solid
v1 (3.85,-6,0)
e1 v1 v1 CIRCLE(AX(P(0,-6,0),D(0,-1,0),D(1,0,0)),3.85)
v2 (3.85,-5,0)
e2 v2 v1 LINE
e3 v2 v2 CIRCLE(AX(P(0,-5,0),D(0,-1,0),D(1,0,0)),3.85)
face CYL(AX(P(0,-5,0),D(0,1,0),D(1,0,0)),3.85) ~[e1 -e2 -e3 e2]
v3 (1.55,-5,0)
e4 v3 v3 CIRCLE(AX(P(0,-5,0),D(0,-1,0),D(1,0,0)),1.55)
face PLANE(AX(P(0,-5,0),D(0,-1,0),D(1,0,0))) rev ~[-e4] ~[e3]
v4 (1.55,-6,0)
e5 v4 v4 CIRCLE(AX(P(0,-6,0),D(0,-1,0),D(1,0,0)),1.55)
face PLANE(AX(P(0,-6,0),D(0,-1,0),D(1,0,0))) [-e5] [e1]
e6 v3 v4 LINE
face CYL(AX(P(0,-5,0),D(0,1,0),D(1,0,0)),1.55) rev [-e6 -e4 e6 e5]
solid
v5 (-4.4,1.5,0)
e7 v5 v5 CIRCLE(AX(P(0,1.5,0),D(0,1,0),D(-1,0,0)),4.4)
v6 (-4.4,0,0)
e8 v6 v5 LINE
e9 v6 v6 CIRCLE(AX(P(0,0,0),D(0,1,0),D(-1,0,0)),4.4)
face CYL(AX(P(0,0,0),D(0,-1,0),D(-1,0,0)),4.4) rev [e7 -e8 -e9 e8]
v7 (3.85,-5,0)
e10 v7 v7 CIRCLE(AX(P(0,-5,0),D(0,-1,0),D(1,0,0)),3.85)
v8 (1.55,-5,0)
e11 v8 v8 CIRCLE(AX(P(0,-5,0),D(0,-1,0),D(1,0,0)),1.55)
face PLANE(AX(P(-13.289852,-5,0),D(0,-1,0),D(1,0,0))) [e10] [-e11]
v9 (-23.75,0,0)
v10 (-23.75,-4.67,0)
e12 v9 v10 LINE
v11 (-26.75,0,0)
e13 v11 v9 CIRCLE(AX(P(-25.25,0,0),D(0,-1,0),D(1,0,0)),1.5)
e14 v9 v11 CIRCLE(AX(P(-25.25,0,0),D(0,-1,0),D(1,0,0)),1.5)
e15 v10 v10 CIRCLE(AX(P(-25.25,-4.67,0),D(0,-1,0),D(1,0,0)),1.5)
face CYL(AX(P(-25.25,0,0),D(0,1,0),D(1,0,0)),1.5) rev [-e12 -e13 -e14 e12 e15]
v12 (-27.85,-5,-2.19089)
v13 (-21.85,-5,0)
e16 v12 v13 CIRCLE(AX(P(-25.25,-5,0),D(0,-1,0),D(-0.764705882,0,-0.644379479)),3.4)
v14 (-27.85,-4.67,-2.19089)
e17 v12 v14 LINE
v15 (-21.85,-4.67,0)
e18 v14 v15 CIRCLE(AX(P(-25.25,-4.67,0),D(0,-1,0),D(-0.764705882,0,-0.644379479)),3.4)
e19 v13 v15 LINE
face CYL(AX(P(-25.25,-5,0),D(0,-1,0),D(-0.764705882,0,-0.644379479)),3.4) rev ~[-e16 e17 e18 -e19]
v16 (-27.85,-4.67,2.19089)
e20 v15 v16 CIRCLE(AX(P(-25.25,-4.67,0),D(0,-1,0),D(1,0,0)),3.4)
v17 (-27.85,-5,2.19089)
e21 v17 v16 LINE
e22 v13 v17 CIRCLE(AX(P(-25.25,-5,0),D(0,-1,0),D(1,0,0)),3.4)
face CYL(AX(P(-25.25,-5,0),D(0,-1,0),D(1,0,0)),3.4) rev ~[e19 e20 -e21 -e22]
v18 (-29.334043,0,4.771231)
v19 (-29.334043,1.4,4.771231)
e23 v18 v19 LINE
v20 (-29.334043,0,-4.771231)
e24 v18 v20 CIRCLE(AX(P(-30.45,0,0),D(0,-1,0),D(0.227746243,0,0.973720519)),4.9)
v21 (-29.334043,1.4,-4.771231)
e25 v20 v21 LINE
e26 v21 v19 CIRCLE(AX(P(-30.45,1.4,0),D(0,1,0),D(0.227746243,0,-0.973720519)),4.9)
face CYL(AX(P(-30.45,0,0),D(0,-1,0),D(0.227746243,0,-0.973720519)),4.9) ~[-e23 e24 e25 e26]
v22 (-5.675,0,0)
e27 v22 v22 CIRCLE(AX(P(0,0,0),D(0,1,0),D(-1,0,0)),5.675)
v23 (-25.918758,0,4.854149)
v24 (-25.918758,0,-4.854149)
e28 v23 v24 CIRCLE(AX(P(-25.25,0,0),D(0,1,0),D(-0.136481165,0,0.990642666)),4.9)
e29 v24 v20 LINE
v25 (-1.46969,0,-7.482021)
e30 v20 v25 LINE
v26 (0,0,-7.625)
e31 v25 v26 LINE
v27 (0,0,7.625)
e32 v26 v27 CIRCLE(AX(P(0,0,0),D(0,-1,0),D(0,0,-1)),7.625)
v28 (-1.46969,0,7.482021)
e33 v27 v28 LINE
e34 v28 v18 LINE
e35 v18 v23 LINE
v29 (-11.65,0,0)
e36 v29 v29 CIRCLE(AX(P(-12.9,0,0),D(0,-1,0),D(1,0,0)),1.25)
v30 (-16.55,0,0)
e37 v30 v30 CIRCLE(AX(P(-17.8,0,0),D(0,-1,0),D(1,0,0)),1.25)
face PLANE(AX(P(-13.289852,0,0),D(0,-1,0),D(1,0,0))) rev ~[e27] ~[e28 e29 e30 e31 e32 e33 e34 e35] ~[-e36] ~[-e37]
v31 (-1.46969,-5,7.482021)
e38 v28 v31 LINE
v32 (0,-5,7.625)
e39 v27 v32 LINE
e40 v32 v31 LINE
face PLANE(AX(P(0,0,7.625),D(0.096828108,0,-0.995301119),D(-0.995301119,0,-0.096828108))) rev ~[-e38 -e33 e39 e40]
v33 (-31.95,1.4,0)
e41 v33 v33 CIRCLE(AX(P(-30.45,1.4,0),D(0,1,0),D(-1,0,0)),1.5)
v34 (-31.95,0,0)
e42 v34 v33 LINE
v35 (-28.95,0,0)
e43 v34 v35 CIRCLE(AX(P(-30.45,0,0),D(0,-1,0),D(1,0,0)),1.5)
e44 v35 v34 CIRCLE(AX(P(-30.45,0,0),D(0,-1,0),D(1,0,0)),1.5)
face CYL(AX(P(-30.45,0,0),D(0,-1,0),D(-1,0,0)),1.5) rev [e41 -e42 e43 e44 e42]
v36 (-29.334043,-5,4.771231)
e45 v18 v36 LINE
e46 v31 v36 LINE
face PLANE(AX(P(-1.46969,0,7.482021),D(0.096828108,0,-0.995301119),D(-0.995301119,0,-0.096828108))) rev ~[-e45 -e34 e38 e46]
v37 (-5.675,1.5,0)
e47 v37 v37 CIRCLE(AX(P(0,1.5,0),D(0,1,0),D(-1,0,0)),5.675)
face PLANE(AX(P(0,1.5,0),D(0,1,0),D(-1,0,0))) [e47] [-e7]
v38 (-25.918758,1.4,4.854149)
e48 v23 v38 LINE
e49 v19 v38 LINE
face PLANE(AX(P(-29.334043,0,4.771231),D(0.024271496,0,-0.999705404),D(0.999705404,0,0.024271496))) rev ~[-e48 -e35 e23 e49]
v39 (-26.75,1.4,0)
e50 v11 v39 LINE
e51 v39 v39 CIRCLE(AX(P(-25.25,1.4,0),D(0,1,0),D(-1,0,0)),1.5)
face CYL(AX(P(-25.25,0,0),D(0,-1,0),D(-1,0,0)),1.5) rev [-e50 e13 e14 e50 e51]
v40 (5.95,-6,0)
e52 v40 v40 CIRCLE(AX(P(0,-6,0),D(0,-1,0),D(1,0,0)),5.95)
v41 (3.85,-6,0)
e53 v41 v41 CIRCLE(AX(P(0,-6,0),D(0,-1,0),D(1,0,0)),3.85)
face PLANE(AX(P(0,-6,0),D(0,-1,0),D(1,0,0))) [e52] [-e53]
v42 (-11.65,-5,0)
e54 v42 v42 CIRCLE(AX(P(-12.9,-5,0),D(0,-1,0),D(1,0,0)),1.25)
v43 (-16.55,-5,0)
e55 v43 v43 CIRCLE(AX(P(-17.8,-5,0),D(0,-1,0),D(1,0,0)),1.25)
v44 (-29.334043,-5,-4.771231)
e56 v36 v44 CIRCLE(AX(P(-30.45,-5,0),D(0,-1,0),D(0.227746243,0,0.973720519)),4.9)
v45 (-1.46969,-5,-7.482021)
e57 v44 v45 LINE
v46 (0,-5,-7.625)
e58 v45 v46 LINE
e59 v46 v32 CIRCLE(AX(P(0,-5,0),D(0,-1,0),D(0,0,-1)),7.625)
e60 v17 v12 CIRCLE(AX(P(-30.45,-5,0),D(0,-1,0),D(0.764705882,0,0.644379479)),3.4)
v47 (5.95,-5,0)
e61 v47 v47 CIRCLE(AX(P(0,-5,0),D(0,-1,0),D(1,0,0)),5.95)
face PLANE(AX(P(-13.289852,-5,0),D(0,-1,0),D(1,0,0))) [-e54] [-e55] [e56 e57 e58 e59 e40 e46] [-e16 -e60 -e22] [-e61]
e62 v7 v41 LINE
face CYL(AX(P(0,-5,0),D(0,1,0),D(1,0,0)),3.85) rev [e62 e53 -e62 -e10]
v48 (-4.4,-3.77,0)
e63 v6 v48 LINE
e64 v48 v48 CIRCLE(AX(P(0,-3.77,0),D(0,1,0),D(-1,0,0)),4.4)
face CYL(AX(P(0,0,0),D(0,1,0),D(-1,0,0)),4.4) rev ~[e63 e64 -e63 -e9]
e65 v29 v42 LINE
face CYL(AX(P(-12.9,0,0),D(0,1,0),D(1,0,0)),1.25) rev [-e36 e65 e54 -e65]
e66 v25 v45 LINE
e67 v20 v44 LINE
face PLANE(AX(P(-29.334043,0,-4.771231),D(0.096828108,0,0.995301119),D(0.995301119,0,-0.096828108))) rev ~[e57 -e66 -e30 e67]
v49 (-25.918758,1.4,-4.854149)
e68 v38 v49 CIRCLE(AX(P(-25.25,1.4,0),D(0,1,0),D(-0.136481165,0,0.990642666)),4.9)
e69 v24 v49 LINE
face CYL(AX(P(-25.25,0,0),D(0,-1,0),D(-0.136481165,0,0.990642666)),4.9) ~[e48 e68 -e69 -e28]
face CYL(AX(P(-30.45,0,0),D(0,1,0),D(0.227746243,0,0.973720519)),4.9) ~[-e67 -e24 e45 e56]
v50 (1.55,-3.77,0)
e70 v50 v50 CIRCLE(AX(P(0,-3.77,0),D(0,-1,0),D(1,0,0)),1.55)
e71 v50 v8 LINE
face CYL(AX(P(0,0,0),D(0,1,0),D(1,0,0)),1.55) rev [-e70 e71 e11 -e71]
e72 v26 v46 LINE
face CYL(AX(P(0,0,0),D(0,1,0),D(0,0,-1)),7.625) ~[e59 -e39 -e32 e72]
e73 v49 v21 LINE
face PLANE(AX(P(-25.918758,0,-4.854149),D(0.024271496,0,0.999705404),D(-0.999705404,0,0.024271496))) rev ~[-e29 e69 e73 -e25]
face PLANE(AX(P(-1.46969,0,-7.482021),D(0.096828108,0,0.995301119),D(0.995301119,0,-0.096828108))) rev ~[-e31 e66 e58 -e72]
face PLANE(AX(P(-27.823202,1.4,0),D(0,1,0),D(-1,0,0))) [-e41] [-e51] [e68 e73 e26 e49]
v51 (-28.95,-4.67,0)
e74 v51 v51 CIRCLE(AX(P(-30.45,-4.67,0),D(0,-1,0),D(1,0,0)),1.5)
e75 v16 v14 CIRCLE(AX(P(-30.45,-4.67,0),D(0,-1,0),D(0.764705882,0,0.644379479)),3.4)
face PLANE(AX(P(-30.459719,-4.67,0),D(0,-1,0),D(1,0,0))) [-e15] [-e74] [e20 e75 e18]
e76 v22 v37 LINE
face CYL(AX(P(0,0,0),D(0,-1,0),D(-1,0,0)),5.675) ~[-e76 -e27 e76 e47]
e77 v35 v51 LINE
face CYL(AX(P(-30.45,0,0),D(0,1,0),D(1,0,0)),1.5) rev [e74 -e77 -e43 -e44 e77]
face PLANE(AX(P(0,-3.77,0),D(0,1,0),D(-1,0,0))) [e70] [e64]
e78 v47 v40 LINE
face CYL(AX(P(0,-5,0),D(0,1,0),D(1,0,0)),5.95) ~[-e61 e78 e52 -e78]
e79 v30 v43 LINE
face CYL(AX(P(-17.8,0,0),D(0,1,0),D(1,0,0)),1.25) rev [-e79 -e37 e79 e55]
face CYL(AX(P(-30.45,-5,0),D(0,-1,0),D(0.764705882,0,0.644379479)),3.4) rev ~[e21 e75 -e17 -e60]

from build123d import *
from build123d import SkipClean  # not in build123d's __all__

# Parameters (mm, degrees)
F0_R     = 1.5
F0_R_2   = 1.25
F0_R_3   = 1.55
F1_DEPTH = 5
F2_R     = 1.5
F3_DEPTH = 0.33
F2_R_2   = 5.95
F2_R_3   = 3.85
F4_DEPTH = 1
F5_R     = 1.5
F6_DEPTH = 1.4
F5_R_2   = 5.675
F5_R_3   = 4.4
F7_DEPTH = 1.5
F5_R_4   = 1.55
F8_DEPTH = 3.77
F2_R_4   = 1.55
F9_DEPTH = 1


# Not quite as in the source:
# - after a boolean that leaves OpenCascade's solid faulty, fix() repairs it


with BuildPart() as f1:
    # F0 (on Front) → F1 (new body)
    with BuildSketch(Plane.XZ):
        with BuildLine():
            Line((-29.334043409, -4.7712305422), (-1.4696901505, -7.4820208408))
            Line((-1.4696901505, -7.4820208408), (0, -7.625))
            ThreePointArc((0, -7.625), (7.625, 0), (0, 7.625))
            Line((0, 7.625), (-1.4696901505, 7.4820208408))
            Line((-1.4696901505, 7.4820208408), (-29.334043409, 4.7712305422))
            ThreePointArc((-29.334043409, 4.7712305422), (-35.35, 0), (-29.334043409, -4.7712305422))
        make_face()
        with Locations((-30.45, 0)):
            Circle(F0_R, mode=Mode.SUBTRACT)
        with Locations((-25.25, 0)):
            Circle(F0_R, mode=Mode.SUBTRACT)
        with Locations((-17.8, 0)):
            Circle(F0_R_2, mode=Mode.SUBTRACT)
        with Locations((-12.9, 0)):
            Circle(F0_R_2, mode=Mode.SUBTRACT)
        Circle(F0_R_3, mode=Mode.SUBTRACT)
    extrude(amount=F1_DEPTH)

    # F2 (on face) → F3 (cut)
    with BuildSketch(Plane.XZ.offset(5)):
        with BuildLine():
            ThreePointArc((-27.85, -2.19089023), (-28.65, 0), (-27.85, 2.19089023))
            ThreePointArc((-27.85, 2.19089023), (-33.85, 0), (-27.85, -2.19089023))
        make_face()
        with Locations((-30.45, 0)):
            Circle(F2_R, mode=Mode.SUBTRACT)
        with BuildLine():
            ThreePointArc((-27.85, -2.19089023), (-27.2562561155, -1.166190379), (-27.05, 0))
            ThreePointArc((-27.05, 0), (-27.2562561155, 1.166190379), (-27.85, 2.19089023))
            ThreePointArc((-27.85, 2.19089023), (-28.65, 0), (-27.85, -2.19089023))
        make_face()
        with BuildLine():
            ThreePointArc((-27.85, 2.19089023), (-27.2562561155, 1.166190379), (-27.05, 0))
            ThreePointArc((-27.05, 0), (-27.2562561155, -1.166190379), (-27.85, -2.19089023))
            ThreePointArc((-27.85, -2.19089023), (-24.083809621, -3.1937438845), (-21.85, 0))
            ThreePointArc((-21.85, 0), (-24.083809621, 3.1937438845), (-27.85, 2.19089023))
        make_face()
        with Locations((-25.25, 0)):
            Circle(F2_R, mode=Mode.SUBTRACT)
    extrude(amount=-F3_DEPTH, mode=Mode.SUBTRACT)

    # F2 (on face) → F4 (join)
    with BuildSketch(Plane.XZ.offset(5)):
        Circle(F2_R_2)
        Circle(F2_R_3, mode=Mode.SUBTRACT)
    extrude(amount=F4_DEPTH)

    # F5 (on face) → F6 (join)
    with BuildSketch(Plane(origin=(0, 0, 0), x_dir=(-1, 0, 0), z_dir=(0, 1, 0))):
        with BuildLine():
            ThreePointArc((25.9187577076, -4.8541490633), (26.9215224824, -4.6060843013), (27.85, -4.1533119315))
            ThreePointArc((27.85, -4.1533119315), (28.5665087739, -4.5235451585), (29.334043409, -4.7712305422))
            ThreePointArc((29.334043409, -4.7712305422), (35.35, 0), (29.334043409, 4.7712305422))
            ThreePointArc((29.334043409, 4.7712305422), (28.5665087739, 4.5235451585), (27.85, 4.1533119315))
            ThreePointArc((27.85, 4.1533119315), (26.9215224824, 4.6060843013), (25.9187577076, 4.8541490633))
            ThreePointArc((25.9187577076, 4.8541490633), (20.35, 0), (25.9187577076, -4.8541490633))
        make_face()
        with Locations((25.25, 0)):
            Circle(F5_R, mode=Mode.SUBTRACT)
        with Locations((30.45, 0)):
            Circle(F5_R, mode=Mode.SUBTRACT)
        with BuildLine():
            ThreePointArc((29.334043409, -4.7712305422), (28.5665087739, -4.5235451585), (27.85, -4.1533119315))
            ThreePointArc((27.85, -4.1533119315), (26.9215224824, -4.6060843013), (25.9187577076, -4.8541490633))
            Line((25.9187577076, -4.8541490633), (29.334043409, -4.7712305422))
        make_face()
        with BuildLine():
            ThreePointArc((27.85, 4.1533119315), (28.5665087739, 4.5235451585), (29.334043409, 4.7712305422))
            Line((29.334043409, 4.7712305422), (25.9187577076, 4.8541490633))
            ThreePointArc((25.9187577076, 4.8541490633), (26.9215224824, 4.6060843013), (27.85, 4.1533119315))
        make_face()
    with SkipClean():  # cleaning this boolean's faces spoils the solid; the shape is the same uncleaned
        extrude(amount=F6_DEPTH)

    # F5 (on face) → F7 (join)
    with BuildSketch(Plane(origin=(0, 0, 0), x_dir=(-1, 0, 0), z_dir=(0, 1, 0))):
        Circle(F5_R_2)
        Circle(F5_R_3, mode=Mode.SUBTRACT)
    extrude(amount=F7_DEPTH)

    add(f1.part.fix(), mode=Mode.REPLACE)

    # F5 (on face) → F8 (cut)
    with BuildSketch(Plane(origin=(0, 0, 0), x_dir=(-1, 0, 0), z_dir=(0, 1, 0))):
        Circle(F5_R_3)
        Circle(F5_R_4, mode=Mode.SUBTRACT)
    extrude(amount=-F8_DEPTH, mode=Mode.SUBTRACT)


with BuildPart() as f9:
    # F2 (on face) → F9 (new body)
    with BuildSketch(Plane.XZ.offset(5)):
        Circle(F2_R_3)
        Circle(F2_R_4, mode=Mode.SUBTRACT)
    extrude(amount=F9_DEPTH)


solid = Compound([f1.part, f9.part])
